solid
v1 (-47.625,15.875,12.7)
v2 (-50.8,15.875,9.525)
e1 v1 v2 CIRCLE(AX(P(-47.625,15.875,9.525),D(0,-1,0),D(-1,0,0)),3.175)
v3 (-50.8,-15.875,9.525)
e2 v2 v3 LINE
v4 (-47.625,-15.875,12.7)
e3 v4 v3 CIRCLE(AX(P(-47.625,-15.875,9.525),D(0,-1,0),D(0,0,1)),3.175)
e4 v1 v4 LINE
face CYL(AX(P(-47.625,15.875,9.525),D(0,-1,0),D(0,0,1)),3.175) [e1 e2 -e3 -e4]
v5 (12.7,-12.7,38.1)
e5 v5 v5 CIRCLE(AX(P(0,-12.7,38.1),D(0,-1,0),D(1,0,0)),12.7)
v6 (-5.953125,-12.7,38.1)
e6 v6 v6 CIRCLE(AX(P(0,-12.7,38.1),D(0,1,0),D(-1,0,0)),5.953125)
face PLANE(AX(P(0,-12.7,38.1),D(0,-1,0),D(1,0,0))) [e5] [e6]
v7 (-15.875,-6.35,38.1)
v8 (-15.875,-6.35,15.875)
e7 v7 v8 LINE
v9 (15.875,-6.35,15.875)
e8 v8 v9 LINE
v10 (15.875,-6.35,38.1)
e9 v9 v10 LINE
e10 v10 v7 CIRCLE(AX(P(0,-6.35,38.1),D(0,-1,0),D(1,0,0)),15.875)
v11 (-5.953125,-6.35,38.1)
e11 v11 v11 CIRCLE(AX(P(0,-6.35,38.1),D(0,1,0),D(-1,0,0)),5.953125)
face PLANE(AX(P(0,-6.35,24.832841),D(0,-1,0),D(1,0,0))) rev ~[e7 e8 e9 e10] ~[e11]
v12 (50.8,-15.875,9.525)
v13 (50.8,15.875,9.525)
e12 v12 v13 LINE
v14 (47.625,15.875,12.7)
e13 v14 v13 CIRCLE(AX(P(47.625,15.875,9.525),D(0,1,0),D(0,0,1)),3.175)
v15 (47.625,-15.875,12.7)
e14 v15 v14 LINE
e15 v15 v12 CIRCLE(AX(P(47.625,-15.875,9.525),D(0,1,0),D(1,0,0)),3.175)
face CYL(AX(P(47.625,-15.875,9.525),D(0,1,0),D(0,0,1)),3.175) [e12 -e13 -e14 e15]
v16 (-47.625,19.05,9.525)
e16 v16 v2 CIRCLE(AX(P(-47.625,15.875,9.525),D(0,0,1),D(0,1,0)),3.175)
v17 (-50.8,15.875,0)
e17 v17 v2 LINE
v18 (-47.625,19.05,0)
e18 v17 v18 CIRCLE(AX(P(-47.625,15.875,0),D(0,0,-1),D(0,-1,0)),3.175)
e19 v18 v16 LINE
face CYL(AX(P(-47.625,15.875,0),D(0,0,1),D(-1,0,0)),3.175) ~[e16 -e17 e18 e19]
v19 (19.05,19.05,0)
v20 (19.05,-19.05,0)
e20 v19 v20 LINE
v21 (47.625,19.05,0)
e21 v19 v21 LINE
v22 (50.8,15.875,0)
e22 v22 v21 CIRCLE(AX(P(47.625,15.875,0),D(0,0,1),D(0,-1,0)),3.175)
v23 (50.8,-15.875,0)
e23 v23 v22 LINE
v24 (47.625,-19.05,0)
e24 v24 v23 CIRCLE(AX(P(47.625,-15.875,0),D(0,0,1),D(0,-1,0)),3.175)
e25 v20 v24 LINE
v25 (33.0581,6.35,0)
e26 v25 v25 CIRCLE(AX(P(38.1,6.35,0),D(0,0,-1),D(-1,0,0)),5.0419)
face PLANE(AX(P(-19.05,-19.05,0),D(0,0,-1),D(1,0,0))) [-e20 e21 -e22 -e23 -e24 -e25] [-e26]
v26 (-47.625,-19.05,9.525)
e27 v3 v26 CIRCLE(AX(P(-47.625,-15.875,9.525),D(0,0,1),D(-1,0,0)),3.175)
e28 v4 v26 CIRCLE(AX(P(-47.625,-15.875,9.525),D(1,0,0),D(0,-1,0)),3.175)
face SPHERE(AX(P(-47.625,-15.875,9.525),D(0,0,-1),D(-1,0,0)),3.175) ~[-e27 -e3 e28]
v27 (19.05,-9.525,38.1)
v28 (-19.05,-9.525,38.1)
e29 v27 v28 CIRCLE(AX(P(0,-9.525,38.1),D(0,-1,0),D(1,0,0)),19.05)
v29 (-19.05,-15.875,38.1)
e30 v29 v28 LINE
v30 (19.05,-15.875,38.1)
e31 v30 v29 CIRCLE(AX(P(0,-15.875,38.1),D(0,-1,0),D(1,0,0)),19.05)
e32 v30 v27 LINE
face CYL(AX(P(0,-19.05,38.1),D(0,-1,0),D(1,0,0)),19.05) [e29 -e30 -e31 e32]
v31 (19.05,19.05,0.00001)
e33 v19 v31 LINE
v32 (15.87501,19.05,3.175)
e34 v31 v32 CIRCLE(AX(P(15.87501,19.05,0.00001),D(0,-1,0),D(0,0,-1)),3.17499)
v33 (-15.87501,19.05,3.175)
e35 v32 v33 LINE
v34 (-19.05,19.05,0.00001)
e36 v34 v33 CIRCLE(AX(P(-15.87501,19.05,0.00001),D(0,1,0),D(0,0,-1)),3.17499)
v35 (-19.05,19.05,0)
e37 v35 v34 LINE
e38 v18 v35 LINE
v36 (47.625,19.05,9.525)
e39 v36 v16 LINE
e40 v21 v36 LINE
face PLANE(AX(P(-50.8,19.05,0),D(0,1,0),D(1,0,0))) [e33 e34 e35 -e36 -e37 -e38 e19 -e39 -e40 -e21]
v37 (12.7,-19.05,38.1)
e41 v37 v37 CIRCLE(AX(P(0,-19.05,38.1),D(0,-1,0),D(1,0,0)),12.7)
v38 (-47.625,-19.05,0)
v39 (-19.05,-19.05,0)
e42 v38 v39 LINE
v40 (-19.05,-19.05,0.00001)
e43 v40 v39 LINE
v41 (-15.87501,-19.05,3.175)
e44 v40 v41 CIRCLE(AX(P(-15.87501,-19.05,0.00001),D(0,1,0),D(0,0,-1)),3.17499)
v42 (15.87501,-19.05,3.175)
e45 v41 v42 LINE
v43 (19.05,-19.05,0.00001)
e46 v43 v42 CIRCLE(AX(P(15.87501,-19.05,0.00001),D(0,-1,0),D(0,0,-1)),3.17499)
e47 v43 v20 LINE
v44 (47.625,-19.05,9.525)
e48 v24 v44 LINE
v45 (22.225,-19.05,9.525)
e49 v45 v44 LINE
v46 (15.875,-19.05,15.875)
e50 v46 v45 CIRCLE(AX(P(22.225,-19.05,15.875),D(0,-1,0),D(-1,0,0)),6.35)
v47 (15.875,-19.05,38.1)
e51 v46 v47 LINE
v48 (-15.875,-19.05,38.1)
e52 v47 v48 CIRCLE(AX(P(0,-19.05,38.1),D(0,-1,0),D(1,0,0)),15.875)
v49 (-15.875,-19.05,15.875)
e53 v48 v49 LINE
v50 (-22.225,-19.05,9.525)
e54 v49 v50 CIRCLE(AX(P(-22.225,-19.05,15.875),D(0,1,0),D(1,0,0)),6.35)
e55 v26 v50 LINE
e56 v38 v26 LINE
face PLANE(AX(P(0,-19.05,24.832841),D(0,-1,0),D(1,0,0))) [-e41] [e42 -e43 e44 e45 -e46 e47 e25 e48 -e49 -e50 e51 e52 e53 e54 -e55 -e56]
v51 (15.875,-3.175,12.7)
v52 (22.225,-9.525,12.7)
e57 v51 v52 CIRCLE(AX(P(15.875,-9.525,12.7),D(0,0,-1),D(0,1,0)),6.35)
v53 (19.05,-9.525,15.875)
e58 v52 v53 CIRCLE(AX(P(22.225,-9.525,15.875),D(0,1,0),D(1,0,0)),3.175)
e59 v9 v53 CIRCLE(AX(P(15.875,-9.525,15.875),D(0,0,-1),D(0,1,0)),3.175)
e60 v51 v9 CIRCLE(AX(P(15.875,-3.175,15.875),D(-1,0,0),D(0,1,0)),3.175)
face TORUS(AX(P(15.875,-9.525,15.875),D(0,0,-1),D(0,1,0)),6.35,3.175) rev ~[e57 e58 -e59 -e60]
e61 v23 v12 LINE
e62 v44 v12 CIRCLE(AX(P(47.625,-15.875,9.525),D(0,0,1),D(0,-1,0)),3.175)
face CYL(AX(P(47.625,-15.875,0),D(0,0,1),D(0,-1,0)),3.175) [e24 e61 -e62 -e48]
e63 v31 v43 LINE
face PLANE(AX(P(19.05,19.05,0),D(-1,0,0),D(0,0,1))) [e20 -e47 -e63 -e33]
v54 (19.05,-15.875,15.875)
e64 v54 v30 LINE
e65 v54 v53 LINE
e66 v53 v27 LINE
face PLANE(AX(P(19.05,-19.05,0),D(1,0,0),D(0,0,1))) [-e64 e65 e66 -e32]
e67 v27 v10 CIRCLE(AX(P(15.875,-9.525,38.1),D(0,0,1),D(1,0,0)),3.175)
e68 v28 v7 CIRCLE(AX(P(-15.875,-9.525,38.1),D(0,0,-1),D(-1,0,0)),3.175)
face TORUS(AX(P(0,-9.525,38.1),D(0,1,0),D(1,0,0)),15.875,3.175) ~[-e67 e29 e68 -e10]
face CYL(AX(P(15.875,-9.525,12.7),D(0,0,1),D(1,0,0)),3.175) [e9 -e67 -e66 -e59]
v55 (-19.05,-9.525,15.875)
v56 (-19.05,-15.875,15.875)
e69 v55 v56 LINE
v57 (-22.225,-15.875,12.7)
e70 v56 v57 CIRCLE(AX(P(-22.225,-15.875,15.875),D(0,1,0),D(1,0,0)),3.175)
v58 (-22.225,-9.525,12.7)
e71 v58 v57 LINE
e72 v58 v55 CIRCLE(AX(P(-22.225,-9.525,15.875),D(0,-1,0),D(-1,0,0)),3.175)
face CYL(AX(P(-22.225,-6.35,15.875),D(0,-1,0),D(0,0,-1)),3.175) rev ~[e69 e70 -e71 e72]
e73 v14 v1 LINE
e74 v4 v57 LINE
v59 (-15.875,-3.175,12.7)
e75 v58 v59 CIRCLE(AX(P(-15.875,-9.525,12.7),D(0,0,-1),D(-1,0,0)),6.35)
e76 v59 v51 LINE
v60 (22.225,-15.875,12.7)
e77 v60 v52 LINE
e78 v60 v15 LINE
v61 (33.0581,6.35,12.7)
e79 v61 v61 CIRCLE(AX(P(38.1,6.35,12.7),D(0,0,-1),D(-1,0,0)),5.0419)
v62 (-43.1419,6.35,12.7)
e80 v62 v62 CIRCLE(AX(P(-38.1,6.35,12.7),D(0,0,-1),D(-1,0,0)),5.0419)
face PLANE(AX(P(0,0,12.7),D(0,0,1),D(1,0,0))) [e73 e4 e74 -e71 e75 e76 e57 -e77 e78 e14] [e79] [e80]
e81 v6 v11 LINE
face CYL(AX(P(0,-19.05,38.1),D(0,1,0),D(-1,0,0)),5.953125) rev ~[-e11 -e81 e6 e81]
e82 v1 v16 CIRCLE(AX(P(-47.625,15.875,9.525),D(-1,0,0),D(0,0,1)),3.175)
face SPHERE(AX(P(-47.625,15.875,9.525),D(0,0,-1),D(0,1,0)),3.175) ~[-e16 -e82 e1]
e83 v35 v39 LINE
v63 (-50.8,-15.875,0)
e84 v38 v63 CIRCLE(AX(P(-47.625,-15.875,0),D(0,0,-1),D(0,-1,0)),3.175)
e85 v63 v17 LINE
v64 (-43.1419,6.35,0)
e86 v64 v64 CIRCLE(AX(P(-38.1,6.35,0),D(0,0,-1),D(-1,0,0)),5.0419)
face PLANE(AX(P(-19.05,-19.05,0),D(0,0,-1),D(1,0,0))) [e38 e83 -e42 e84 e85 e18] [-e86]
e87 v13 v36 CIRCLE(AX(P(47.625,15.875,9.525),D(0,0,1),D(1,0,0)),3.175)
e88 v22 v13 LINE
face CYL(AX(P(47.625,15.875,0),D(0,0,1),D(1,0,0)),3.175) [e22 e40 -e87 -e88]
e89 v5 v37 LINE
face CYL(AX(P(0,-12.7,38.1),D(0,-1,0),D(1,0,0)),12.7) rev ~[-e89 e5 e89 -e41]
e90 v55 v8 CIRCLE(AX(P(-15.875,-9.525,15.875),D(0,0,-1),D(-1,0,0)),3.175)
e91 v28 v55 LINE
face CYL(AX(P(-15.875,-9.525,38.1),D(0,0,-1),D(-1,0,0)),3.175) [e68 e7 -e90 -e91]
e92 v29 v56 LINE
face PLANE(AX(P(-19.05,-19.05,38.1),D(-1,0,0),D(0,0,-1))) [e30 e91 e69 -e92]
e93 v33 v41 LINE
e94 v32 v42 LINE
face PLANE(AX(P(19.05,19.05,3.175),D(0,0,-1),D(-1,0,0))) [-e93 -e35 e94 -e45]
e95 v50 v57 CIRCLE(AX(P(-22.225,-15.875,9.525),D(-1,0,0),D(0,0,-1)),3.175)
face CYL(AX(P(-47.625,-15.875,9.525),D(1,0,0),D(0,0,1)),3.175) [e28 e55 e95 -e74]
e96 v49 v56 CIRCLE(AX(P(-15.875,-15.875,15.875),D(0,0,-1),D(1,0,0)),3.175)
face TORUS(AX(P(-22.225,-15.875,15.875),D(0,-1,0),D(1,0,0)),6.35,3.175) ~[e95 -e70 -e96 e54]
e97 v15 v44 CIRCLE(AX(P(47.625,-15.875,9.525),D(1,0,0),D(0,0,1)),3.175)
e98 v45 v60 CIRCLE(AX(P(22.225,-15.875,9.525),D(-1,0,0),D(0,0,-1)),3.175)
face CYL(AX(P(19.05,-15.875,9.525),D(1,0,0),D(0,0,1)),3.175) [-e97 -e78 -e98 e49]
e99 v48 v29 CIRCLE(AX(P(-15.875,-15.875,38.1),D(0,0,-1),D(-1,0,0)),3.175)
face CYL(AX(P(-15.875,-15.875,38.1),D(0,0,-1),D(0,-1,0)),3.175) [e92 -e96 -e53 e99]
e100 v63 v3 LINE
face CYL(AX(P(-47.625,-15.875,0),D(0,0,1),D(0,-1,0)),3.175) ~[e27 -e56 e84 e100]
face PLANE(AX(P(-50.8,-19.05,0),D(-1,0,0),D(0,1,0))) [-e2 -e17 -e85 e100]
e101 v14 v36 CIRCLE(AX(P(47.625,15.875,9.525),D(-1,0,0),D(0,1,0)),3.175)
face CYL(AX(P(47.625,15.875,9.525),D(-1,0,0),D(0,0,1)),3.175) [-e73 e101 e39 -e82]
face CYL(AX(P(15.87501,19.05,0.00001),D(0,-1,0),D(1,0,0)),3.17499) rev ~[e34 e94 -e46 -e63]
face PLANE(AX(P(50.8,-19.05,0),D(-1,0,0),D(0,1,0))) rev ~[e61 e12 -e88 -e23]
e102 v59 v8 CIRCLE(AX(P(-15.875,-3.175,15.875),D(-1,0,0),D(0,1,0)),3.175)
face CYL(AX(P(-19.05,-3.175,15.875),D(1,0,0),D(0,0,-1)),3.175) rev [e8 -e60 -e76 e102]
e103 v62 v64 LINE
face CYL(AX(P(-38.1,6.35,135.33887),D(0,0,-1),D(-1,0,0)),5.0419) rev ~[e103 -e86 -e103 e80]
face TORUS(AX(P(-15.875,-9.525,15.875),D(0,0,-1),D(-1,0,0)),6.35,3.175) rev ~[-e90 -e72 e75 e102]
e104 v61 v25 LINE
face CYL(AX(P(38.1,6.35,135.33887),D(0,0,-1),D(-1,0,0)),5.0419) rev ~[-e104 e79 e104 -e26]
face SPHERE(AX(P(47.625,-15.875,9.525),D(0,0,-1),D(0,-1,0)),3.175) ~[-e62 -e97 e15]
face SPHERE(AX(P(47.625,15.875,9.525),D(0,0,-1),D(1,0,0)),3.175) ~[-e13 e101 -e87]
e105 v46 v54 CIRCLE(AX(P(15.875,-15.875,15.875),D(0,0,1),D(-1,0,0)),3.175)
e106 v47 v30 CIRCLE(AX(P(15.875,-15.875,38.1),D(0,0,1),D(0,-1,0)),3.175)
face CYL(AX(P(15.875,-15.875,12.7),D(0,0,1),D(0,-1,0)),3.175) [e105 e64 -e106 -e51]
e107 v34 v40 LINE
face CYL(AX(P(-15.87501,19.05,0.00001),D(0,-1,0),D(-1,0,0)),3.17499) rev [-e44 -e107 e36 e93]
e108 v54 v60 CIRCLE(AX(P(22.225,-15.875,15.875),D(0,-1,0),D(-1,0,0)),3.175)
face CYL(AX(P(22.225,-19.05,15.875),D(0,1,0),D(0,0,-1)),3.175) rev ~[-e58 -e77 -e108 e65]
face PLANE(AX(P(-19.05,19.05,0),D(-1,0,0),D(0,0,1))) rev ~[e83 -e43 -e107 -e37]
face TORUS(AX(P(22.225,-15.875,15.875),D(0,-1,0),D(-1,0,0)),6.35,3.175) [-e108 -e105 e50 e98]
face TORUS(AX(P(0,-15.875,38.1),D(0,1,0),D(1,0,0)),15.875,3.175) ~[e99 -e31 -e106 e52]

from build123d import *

# Parameters (mm, degrees)
F0_W           = 101.6
F0_H           = 38.1
F1_DEPTH       = 12.7
F3_DEPTH       = 12.7
F4_D           = 11.90625
F4_CBORE_D     = 25.4
F4_CBORE_DEPTH = 6.35
F5_W           = 38.1
F5_H           = 3.175
F6_DEPTH       = 38.101
F8_D           = 10.0838
F9_R           = 3.175
F10_R          = 3.175
F11_R          = 3.175
F12_R          = 3.17499
F13_R          = 3.175


# Not quite as in the source:
# - a fillet or chamfer is up to 0.001 mm smaller than in the source, because OpenCascade refuses the exact size
# - a length typed as a fraction of an inch, garbled in the dataset ("3 / 203.2 mm" for 3/8 in), is restored


with BuildPart() as f1:
    # F0 (on Top) → F1 (new body)
    with BuildSketch(Plane.XY):
        Rectangle(F0_W, F0_H)
    extrude(amount=F1_DEPTH)

    # F2 (on face) → F3 (join)
    with BuildSketch(Plane.XZ.offset(19.05)):
        with BuildLine():
            Line((-19.05, 38.1), (-19.05, 0))
            Line((-19.05, 0), (19.05, 0))
            Line((19.05, 0), (19.05, 38.1))
            ThreePointArc((19.05, 38.1), (0, 57.15), (-19.05, 38.1))
        make_face()
    extrude(amount=-F3_DEPTH)

    # F4 (through all)
    with Locations(Plane.XZ.offset(19.05)):
        with Locations((0, 38.1)):
            CounterBoreHole(F4_D / 2, F4_CBORE_D / 2, F4_CBORE_DEPTH)

    # F5 (on face) → F6 (cut, through all)
    with BuildSketch(Plane(origin=(0, 19.05, 0), x_dir=(-1, 0, 0), z_dir=(0, 1, 0))):
        with Locations((0, 1.5875)):
            Rectangle(F5_W, F5_H)
    extrude(amount=-F6_DEPTH, mode=Mode.SUBTRACT)

    # F8 (through all)
    with Locations(Plane.XY.offset(12.7)):
        with Locations((-38.1, 6.35), (38.1, 6.35)):
            Hole(F8_D / 2)

    # F9
    f9_edges = [f1.edges().sort_by_distance(p)[0] for p in [
        (-50.8, -19.05, 6.35),
    ]]
    fillet(f9_edges, radius=F9_R)

    # F10
    f10_edges = [f1.edges().sort_by_distance(p)[0] for p in [
        (-50.8, 19.05, 6.35),
        (50.8, -19.05, 6.35),
    ]]
    fillet(f10_edges, radius=F10_R)

    # F11
    f11_edges = [f1.edges().sort_by_distance(p)[0] for p in [
        (50.8, 19.05, 6.35),
    ]]
    fillet(f11_edges, radius=F11_R)

    # F12 (radius 3.175 in the source; OpenCascade refuses exactly that, so slightly less here)
    f12_edges = [f1.edges().sort_by_distance(p)[0] for p in [
        (-19.05, 0, 3.175),
        (19.05, 0, 3.175),
    ]]
    fillet(f12_edges, radius=F12_R)

    # F13
    f13_edges = [f1.edges().sort_by_distance(p)[0] for p in [
        (0, -19.05, 57.15),
        (19.05, -19.05, 25.4),
        (-19.05, -19.05, 25.4),
        (-33.3375, -19.05, 12.7),
        (33.3375, -19.05, 12.7),
        (49.870064, -18.120064, 12.7),
        (50.8, 0, 12.7),
        (0, 19.05, 12.7),
        (49.870064, 18.120064, 12.7),
        (-49.870064, 18.120064, 12.7),
        (-50.8, 0, 12.7),
        (-49.870064, -18.120064, 12.7),
        (19.05, -12.7, 12.7),
        (19.05, -6.35, 25.4),
        (0, -6.35, 57.15),
        (-19.05, -6.35, 25.4),
        (-19.05, -12.7, 12.7),
        (0, -6.35, 12.7),
    ]]
    fillet(f13_edges, radius=F13_R)


solid = f1.part
